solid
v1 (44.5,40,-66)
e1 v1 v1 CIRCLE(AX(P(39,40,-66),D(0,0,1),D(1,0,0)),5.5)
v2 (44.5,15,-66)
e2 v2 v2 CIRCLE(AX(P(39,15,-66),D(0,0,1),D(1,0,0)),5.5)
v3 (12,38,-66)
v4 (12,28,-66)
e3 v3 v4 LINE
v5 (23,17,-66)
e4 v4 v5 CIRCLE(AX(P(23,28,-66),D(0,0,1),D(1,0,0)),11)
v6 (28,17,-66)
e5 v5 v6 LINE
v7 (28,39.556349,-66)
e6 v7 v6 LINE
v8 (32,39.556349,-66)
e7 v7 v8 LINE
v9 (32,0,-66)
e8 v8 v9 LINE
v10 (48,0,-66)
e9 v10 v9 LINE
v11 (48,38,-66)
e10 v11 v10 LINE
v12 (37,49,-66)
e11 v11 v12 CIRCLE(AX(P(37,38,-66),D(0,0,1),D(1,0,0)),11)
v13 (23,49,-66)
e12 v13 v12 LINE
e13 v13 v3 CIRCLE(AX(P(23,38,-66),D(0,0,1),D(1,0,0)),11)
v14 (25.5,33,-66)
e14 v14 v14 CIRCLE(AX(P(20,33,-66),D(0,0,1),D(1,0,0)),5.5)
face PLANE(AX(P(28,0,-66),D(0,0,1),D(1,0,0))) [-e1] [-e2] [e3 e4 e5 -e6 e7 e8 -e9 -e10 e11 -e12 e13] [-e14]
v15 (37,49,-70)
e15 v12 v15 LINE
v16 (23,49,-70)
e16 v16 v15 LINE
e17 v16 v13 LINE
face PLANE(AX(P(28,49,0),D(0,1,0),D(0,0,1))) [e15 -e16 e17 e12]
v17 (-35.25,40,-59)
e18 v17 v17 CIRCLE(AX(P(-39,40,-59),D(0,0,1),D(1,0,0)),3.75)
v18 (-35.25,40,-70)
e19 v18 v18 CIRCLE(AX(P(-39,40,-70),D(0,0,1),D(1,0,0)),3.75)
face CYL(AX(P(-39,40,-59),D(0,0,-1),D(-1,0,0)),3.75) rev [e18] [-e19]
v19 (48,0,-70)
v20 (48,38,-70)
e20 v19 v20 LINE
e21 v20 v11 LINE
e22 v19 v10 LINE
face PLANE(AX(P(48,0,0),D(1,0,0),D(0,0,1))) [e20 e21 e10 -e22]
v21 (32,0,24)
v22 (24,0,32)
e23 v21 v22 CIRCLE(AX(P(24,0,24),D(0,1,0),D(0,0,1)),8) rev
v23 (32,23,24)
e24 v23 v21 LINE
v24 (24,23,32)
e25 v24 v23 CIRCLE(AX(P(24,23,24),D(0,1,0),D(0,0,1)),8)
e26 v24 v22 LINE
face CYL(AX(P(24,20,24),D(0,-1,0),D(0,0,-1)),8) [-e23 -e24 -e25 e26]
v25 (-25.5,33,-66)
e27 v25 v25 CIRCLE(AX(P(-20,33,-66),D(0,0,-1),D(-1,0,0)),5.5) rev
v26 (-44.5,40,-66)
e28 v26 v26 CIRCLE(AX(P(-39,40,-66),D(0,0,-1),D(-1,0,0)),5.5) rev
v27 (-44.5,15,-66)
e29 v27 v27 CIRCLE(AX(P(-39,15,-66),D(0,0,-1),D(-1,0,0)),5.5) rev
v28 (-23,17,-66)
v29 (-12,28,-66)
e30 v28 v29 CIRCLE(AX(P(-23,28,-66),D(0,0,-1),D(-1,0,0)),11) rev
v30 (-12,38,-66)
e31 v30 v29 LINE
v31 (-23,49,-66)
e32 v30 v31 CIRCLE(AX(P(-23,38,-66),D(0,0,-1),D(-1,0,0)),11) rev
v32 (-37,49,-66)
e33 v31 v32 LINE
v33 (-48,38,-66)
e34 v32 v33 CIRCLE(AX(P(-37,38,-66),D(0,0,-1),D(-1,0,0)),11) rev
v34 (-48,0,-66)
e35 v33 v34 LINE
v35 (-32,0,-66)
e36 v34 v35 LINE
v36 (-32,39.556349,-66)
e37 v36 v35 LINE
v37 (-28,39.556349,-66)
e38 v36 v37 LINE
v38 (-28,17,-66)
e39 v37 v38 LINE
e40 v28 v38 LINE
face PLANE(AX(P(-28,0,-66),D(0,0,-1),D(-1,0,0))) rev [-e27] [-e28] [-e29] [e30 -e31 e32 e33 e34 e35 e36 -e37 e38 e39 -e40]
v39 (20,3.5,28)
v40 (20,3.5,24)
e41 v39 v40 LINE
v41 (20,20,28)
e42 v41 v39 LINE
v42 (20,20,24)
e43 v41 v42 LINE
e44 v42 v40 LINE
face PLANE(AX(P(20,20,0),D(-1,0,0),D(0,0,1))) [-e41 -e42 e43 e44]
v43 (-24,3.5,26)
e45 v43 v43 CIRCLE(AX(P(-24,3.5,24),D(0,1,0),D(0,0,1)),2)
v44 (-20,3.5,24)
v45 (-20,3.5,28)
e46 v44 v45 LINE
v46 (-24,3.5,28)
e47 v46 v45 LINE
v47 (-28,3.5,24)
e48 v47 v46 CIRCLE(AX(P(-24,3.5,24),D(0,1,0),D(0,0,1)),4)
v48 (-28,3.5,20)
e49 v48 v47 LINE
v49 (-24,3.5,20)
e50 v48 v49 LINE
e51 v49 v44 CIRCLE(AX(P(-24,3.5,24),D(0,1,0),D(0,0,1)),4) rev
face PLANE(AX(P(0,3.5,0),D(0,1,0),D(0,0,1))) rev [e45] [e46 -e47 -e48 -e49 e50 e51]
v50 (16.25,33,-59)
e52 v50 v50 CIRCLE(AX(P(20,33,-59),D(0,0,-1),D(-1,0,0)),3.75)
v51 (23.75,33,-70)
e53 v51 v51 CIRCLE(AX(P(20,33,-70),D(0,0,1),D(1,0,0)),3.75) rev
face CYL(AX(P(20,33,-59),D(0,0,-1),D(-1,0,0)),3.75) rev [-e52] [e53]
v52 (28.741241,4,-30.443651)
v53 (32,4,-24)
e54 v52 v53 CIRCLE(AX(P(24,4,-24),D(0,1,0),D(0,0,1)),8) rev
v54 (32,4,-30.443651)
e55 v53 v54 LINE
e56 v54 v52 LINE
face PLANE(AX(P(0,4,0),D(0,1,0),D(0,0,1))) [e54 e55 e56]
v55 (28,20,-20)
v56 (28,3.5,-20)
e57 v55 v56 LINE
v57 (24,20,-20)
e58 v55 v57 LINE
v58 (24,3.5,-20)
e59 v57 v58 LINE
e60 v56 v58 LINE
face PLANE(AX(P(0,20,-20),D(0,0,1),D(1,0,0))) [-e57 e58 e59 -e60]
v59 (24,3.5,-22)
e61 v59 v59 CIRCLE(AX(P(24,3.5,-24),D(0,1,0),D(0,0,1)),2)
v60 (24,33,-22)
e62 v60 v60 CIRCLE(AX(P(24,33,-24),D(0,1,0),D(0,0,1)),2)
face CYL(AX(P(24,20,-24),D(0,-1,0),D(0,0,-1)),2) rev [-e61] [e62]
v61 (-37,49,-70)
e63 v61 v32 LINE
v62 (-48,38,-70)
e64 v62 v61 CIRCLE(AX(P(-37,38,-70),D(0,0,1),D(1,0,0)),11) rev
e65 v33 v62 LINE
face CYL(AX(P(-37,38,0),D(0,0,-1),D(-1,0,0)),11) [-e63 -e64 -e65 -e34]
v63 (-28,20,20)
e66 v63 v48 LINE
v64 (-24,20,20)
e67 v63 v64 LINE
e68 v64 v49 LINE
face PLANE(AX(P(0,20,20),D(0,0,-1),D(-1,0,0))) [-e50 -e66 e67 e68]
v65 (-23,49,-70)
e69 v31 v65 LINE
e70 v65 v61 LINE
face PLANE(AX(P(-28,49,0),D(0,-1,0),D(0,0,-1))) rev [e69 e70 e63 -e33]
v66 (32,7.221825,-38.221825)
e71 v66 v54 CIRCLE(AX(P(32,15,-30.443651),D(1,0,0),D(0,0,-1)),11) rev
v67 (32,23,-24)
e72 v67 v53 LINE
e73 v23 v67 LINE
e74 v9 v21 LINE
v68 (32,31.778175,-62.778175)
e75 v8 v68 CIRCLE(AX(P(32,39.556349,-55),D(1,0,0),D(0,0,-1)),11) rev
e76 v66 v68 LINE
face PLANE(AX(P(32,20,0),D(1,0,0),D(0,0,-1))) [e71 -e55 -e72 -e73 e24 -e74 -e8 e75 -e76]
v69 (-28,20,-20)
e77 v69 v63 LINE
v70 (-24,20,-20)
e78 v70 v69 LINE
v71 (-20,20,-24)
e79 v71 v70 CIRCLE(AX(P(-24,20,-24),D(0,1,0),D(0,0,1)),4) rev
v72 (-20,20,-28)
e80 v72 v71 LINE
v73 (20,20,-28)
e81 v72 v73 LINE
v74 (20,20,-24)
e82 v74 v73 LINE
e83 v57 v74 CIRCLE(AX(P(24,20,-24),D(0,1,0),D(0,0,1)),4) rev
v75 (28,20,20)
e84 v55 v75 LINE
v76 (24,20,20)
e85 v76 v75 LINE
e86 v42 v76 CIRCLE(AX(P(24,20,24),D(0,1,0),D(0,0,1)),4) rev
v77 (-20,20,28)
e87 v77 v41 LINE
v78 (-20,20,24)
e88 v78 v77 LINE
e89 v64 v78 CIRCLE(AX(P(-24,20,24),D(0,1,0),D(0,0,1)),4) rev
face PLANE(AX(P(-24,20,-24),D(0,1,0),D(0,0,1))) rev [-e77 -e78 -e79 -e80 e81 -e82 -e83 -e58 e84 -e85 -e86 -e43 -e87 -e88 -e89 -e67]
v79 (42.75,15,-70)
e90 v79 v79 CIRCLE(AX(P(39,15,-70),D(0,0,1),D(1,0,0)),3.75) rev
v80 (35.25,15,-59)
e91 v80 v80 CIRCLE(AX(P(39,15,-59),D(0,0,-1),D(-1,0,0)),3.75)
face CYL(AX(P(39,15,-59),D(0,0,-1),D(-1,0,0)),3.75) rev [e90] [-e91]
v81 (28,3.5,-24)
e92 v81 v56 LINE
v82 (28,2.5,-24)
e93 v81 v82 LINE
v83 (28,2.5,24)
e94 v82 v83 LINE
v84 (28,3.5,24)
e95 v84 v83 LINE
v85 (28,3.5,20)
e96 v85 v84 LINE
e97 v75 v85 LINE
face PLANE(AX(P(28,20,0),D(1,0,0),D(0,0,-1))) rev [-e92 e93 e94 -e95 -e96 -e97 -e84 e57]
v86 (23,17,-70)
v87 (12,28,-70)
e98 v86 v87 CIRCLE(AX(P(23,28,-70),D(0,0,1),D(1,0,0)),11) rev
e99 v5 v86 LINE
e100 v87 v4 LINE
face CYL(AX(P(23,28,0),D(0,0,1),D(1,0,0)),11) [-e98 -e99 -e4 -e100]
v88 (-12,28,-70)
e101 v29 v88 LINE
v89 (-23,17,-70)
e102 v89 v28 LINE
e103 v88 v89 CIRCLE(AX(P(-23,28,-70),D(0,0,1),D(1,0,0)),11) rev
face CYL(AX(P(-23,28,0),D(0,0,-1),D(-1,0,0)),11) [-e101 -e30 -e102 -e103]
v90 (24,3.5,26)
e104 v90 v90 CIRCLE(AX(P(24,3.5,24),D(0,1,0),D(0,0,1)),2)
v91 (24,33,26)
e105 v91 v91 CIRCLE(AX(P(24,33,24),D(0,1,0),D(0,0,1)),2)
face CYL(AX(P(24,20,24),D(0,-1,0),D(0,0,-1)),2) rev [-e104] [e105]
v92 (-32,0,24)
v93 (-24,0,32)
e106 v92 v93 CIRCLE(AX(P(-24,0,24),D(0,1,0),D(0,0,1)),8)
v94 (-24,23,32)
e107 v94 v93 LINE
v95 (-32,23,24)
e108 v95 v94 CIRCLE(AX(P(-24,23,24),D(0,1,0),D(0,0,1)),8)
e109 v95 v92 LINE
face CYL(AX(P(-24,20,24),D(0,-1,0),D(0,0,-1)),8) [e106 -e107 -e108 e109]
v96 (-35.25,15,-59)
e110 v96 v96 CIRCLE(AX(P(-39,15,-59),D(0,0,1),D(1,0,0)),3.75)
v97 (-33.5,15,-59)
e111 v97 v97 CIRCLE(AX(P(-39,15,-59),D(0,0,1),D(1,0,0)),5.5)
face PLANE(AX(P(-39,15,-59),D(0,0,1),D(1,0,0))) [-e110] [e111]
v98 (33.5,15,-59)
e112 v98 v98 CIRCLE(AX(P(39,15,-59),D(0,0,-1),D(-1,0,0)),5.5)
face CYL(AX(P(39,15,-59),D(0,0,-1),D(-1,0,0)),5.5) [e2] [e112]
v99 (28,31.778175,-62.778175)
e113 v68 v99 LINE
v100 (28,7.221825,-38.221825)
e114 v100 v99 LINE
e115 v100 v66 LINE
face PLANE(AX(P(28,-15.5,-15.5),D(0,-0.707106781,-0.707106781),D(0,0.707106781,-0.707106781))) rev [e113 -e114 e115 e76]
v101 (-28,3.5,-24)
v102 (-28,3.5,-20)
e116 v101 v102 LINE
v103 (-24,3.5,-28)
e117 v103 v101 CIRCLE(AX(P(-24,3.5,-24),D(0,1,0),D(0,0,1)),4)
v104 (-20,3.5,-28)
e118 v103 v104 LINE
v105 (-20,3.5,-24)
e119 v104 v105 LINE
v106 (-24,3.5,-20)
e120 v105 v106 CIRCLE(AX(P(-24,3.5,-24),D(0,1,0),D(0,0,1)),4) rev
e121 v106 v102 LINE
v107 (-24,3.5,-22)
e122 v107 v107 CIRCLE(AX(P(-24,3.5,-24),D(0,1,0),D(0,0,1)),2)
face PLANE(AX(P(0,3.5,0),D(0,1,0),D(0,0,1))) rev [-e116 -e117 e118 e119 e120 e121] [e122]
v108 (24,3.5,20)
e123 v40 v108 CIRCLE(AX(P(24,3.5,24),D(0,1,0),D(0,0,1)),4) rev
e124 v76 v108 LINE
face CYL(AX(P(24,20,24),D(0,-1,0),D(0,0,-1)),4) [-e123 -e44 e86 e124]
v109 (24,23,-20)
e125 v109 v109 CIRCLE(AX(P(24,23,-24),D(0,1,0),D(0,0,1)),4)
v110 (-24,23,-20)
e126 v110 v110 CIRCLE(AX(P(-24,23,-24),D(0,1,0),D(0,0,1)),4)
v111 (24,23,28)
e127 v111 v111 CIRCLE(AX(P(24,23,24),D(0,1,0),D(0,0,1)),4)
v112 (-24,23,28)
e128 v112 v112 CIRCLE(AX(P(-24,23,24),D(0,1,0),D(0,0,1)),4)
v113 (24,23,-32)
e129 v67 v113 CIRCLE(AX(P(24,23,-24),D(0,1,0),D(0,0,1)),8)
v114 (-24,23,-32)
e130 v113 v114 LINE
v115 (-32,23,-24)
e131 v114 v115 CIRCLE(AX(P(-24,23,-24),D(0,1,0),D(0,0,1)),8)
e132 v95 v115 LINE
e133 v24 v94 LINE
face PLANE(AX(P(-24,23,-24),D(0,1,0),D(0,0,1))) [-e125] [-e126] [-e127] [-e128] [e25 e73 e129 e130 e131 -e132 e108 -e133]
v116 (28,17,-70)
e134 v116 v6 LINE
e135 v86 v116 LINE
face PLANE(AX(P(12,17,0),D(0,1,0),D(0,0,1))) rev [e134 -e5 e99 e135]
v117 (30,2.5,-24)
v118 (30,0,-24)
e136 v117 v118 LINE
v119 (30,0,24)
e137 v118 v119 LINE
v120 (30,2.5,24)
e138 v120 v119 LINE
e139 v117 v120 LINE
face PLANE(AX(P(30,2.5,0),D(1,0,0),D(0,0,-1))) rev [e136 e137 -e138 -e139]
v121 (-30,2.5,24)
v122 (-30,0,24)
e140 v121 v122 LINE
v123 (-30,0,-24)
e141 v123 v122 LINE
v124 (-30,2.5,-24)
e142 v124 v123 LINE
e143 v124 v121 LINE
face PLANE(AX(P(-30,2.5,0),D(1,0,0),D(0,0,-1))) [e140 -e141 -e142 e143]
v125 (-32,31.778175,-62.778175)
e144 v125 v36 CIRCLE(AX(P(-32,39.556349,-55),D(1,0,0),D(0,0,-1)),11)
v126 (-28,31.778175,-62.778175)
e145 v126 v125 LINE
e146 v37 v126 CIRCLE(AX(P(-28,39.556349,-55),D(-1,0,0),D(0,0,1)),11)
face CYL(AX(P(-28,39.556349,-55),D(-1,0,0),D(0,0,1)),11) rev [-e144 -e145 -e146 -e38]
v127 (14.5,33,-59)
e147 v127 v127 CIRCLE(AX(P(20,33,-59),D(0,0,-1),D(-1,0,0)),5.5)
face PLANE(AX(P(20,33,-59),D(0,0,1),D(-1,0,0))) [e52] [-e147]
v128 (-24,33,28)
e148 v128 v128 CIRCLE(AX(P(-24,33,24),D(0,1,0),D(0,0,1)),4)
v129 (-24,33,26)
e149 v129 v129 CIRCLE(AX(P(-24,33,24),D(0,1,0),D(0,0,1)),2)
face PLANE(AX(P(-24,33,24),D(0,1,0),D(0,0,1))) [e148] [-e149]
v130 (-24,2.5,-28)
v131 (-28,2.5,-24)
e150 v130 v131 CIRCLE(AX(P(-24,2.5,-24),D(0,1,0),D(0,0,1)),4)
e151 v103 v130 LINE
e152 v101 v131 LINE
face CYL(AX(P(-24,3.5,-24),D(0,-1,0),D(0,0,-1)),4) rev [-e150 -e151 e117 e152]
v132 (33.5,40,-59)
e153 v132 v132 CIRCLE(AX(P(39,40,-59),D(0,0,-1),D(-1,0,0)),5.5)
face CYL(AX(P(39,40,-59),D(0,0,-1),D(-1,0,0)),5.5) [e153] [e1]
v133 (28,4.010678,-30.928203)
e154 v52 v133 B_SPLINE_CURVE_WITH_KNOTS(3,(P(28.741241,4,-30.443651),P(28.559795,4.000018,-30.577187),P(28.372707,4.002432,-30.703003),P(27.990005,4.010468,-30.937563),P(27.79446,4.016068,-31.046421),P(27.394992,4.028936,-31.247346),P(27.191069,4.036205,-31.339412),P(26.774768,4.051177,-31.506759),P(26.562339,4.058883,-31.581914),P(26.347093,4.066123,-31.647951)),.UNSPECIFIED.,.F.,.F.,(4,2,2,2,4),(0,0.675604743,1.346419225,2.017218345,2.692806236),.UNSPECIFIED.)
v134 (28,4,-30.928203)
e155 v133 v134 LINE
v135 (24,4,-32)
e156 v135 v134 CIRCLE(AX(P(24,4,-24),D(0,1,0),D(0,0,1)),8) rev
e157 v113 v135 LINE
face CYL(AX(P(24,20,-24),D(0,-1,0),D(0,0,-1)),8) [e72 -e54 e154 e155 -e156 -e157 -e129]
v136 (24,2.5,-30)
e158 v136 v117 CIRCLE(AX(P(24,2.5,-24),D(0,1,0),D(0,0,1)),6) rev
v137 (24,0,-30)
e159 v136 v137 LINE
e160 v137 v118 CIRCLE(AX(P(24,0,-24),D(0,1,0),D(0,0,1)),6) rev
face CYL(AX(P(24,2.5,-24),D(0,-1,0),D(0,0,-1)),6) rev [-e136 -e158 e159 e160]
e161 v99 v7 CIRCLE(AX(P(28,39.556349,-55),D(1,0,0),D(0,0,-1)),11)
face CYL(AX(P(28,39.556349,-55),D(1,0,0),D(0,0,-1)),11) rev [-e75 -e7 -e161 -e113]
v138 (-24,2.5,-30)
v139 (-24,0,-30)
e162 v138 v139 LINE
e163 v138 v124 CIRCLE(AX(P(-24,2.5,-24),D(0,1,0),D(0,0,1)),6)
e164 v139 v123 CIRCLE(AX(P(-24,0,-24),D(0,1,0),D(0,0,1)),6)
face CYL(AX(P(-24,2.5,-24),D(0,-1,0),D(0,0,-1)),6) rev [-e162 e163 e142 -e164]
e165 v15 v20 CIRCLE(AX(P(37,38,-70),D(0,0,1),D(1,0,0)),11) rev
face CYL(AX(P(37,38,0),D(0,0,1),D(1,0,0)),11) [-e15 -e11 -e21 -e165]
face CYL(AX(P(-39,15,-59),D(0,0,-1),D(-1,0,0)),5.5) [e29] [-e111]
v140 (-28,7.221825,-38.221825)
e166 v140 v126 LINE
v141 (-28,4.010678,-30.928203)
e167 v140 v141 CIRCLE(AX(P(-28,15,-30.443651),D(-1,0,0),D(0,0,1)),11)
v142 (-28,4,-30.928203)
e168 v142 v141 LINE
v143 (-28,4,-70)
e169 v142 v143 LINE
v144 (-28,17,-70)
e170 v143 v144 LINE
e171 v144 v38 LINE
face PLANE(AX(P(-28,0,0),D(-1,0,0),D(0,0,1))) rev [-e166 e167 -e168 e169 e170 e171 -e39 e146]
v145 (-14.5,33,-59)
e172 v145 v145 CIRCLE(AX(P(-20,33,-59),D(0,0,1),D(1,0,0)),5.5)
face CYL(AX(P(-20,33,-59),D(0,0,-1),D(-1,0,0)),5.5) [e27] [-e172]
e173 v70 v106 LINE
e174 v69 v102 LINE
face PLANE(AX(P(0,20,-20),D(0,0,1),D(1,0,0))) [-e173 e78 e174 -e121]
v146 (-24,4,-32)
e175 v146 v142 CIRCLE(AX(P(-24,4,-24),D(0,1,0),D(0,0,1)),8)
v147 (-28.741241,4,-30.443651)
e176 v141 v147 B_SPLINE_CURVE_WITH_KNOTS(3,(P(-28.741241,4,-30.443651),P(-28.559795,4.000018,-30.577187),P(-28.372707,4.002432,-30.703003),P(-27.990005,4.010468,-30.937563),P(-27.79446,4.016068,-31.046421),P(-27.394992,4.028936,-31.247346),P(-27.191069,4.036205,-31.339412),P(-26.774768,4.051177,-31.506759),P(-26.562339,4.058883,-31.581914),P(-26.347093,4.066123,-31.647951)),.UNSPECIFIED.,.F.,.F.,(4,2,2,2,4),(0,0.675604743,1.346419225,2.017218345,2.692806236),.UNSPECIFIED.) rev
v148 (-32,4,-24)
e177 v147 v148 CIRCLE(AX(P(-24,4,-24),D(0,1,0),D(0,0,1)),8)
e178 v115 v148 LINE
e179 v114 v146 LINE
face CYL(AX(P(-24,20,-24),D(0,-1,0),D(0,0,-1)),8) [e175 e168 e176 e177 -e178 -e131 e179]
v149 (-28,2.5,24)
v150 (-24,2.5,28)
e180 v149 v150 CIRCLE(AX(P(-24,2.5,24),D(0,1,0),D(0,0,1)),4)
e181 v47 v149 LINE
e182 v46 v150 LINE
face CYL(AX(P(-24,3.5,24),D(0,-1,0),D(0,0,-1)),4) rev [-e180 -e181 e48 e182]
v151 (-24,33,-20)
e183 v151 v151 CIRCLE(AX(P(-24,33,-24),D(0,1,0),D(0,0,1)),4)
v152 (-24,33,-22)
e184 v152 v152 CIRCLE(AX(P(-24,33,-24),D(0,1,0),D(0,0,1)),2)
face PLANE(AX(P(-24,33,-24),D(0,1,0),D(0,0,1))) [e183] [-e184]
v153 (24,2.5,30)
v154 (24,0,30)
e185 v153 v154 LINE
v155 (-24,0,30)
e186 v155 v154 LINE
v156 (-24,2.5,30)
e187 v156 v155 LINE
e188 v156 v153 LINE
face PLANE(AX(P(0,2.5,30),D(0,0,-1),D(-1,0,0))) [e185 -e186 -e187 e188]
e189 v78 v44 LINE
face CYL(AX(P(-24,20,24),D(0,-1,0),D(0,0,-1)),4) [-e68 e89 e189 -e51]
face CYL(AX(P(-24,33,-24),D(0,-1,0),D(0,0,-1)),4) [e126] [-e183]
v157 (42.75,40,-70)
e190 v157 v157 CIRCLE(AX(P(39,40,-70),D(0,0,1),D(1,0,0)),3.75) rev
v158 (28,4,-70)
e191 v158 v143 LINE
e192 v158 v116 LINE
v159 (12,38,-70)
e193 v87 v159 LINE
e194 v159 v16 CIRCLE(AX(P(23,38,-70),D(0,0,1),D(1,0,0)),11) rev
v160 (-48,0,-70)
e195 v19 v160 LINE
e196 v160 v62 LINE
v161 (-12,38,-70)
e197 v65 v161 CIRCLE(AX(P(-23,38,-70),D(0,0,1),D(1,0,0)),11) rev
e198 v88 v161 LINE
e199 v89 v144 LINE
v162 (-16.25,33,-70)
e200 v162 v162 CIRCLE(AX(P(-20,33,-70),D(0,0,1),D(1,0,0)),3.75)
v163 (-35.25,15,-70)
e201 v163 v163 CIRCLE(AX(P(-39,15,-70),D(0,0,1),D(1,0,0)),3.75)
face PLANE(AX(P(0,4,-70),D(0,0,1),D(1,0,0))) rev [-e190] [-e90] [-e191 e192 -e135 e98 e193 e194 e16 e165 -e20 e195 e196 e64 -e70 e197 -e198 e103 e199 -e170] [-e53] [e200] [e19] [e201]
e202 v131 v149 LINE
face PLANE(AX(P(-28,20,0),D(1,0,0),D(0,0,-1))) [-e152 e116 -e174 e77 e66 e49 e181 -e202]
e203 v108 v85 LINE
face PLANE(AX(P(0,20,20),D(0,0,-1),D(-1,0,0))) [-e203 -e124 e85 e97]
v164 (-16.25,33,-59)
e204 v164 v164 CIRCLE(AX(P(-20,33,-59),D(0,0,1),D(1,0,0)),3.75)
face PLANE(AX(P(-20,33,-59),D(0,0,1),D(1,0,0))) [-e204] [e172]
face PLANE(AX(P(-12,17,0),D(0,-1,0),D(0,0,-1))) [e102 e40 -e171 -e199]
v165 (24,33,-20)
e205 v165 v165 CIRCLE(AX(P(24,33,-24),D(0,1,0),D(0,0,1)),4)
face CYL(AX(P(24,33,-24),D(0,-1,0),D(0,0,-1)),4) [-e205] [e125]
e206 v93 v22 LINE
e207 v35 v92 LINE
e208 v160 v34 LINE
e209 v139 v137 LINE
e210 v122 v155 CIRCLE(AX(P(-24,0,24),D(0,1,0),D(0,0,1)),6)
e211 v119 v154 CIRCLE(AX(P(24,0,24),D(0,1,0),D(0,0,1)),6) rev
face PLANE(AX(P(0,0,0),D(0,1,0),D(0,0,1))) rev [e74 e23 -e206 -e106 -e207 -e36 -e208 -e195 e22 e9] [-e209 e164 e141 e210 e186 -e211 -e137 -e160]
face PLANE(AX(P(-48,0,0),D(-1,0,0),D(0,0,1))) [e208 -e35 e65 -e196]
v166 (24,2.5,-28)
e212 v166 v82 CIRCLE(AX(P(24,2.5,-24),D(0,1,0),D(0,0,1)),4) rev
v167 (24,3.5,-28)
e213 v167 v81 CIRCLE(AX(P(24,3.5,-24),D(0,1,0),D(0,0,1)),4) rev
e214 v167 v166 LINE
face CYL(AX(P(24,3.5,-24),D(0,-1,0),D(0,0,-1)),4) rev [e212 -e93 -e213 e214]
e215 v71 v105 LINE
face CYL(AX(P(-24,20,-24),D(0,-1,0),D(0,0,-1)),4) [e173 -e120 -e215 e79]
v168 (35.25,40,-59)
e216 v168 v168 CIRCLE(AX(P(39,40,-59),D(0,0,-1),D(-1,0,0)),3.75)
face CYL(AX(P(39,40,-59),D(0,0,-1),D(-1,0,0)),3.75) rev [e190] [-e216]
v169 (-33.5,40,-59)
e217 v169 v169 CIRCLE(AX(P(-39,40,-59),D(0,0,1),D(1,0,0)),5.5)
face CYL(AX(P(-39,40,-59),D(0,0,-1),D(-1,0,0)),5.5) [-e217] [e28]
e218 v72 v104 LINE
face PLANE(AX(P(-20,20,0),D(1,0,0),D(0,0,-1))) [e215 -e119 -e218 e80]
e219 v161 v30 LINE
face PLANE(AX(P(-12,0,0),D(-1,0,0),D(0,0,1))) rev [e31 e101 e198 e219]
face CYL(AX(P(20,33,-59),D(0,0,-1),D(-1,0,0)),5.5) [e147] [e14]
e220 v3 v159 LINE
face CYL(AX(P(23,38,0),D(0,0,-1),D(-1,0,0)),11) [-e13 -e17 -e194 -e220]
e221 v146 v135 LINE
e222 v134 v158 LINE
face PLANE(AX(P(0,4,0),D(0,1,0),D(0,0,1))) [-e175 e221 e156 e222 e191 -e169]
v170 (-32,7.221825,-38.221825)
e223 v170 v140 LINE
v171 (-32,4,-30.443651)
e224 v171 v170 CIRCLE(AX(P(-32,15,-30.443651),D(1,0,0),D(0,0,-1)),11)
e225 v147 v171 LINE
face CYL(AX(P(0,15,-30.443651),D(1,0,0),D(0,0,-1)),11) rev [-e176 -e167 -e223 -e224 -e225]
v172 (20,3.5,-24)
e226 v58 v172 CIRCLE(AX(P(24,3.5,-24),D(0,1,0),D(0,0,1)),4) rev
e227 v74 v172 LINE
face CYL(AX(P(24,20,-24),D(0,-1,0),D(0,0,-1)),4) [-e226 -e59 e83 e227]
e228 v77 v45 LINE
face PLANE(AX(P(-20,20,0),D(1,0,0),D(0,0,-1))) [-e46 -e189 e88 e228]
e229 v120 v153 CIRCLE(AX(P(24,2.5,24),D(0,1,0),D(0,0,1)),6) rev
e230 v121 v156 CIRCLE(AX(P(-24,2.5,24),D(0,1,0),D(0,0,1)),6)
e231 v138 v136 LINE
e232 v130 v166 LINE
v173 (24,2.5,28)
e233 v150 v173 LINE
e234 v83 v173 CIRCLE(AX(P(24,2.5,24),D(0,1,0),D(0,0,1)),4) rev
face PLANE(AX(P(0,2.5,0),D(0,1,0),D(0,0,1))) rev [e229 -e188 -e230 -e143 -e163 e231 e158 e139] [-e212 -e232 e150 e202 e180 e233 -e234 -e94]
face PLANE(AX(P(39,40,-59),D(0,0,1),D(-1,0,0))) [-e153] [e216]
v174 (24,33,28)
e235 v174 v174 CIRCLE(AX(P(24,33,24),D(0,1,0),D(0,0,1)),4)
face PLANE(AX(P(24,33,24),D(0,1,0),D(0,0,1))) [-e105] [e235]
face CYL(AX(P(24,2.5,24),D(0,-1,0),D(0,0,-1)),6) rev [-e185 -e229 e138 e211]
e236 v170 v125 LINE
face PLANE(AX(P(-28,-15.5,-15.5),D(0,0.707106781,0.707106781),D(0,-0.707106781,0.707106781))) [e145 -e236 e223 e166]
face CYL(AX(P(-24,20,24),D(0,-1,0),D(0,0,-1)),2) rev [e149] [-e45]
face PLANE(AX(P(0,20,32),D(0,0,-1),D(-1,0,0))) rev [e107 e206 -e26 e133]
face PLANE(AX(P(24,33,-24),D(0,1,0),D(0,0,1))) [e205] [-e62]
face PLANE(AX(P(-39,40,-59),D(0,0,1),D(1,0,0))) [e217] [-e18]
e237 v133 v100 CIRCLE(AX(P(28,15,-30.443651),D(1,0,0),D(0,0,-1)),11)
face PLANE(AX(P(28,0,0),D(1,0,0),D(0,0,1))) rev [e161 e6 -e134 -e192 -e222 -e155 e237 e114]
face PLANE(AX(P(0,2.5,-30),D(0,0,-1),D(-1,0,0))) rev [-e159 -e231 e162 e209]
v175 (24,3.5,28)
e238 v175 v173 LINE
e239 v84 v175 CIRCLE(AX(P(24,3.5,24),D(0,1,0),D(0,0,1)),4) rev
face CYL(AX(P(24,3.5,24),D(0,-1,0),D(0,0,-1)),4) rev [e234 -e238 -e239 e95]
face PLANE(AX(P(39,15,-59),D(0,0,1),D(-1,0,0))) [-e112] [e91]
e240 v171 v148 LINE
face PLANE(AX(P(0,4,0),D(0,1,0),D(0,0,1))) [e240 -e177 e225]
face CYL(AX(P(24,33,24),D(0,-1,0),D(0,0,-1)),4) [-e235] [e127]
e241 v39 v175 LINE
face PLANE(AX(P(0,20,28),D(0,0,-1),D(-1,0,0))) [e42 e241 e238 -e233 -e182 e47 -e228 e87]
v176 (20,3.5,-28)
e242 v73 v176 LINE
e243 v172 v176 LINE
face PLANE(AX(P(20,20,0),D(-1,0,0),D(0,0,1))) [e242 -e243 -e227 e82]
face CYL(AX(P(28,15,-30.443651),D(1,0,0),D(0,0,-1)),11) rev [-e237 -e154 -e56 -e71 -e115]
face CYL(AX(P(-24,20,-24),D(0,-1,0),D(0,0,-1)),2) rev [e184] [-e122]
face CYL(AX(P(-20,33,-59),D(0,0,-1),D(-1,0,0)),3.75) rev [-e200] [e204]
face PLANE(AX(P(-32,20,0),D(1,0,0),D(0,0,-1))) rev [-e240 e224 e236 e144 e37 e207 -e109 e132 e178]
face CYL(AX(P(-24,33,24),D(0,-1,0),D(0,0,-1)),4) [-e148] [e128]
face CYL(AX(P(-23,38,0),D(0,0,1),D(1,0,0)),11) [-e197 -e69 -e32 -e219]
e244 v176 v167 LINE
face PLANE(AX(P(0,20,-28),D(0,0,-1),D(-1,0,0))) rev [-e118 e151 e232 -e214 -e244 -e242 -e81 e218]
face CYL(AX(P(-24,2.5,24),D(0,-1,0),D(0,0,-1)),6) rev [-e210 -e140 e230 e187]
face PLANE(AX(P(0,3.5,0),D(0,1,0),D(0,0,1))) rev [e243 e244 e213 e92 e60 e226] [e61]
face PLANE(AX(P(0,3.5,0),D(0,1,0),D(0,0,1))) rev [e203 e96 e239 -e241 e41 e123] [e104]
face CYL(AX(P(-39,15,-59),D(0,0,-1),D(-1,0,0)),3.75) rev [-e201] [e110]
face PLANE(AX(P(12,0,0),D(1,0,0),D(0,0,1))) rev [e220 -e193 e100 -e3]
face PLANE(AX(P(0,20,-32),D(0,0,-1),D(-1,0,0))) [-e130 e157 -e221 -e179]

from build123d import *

# Parameters (mm, degrees)
SKETCH1_R            = 2
BOSS_EXTRUDE1_DEPTH  = 20
CUT_EXTRUDE3_DEPTH   = 2.5
CUT_EXTRUDE4_DEPTH   = 3.5
BOSS_EXTRUDE6_START  = 20
SKETCH1_6_R          = 20
SKETCH1_6_R_2        = 16
SKETCH1_6_R_3        = 6.1
SKETCH1_6_R_4        = 1.5
SKETCH1_6_R_5        = 2
BOSS_EXTRUDE6_DEPTH  = 3
BOSS_EXTRUDE7_DEPTH  = 4
BOSS_EXTRUDE11_DEPTH = 4
SKETCH3_3_W          = 4
SKETCH3_3_H          = 49
BOSS_EXTRUDE12_DEPTH = 16
SKETCH3_4_W          = 4
SKETCH3_4_H          = 6
BOSS_EXTRUDE13_DEPTH = 20
FILLET2_R            = 11
SKETCH4_R            = 5.5
SKETCH4_R_2          = 3.75
BOSS_EXTRUDE14_DEPTH = 7
CUT_EXTRUDE5_START   = -7
SKETCH4_3_R          = 3.75
CUT_EXTRUDE5_DEPTH   = 7
FILLET2_OF_MIRROR2_R = 11
FILLET3_R            = 11
BOSS_EXTRUDE15_START = 23
SKETCH5_R            = 4
SKETCH5_R_2          = 2
BOSS_EXTRUDE15_DEPTH = 10
SKETCH5_2_R          = 2
CUT_EXTRUDE6_DEPTH   = 90


with BuildPart() as part:
    # Sketch1 → Boss-Extrude1 (new body)
    # profile 1 of 6: a face of its own
    with BuildSketch(Plane(origin=(0, 0, 0), x_dir=(1, 0, 0), z_dir=(0, 1, 0))):
        with BuildLine():
            Line((32, -24), (32, 24))
            ThreePointArc((32, 24), (29.656854249, 29.656854249), (24, 32))
            Line((24, 32), (-24, 32))
            ThreePointArc((-24, 32), (-29.656854249, 29.656854249), (-32, 24))
            Line((-32, 24), (-32, -24))
            ThreePointArc((-32, -24), (-29.656854249, -29.656854249), (-24, -32))
            Line((-24, -32), (24, -32))
            ThreePointArc((24, -32), (29.656854249, -29.656854249), (32, -24))
        make_face()
        with BuildLine():
            ThreePointArc((-30, 24), (-28.242640687, 28.242640687), (-24, 30))
            Line((-24, 30), (24, 30))
            ThreePointArc((24, 30), (28.242640687, 28.242640687), (30, 24))
            Line((30, 24), (30, -24))
            ThreePointArc((30, -24), (28.242640687, -28.242640687), (24, -30))
            Line((24, -30), (-24, -30))
            ThreePointArc((-24, -30), (-28.242640687, -28.242640687), (-30, -24))
            Line((-30, -24), (-30, 24))
        make_face(mode=Mode.SUBTRACT)
    # profile 2 of 6: a face of its own
    with BuildSketch(Plane(origin=(0, 0, 0), x_dir=(1, 0, 0), z_dir=(0, 1, 0))):
        with BuildLine():
            Line((24, 30), (-24, 30))
            ThreePointArc((-24, 30), (-28.242640687, 28.242640687), (-30, 24))
            Line((-30, 24), (-30, -24))
            ThreePointArc((-30, -24), (-28.242640687, -28.242640687), (-24, -30))
            Line((-24, -30), (24, -30))
            ThreePointArc((24, -30), (28.242640687, -28.242640687), (30, -24))
            Line((30, -24), (30, 24))
            ThreePointArc((30, 24), (28.242640687, 28.242640687), (24, 30))
        make_face()
        with BuildLine():
            Line((-28, 20), (-28, 24))
            ThreePointArc((-28, 24), (-26.828427125, 26.828427125), (-24, 28))
            Line((-24, 28), (-20, 28))
            Line((-20, 28), (20, 28))
            Line((20, 28), (24, 28))
            ThreePointArc((24, 28), (26.828427125, 26.828427125), (28, 24))
            Line((28, 24), (28, 20))
            Line((28, 20), (28, -20))
            Line((28, -20), (28, -24))
            ThreePointArc((28, -24), (26.828427125, -26.828427125), (24, -28))
            Line((24, -28), (20, -28))
            Line((20, -28), (-20, -28))
            Line((-20, -28), (-24, -28))
            ThreePointArc((-24, -28), (-26.828427125, -26.828427125), (-28, -24))
            Line((-28, -24), (-28, -20))
            Line((-28, -20), (-28, 20))
        make_face(mode=Mode.SUBTRACT)
    # profile 3 of 6: a face of its own
    with BuildSketch(Plane(origin=(0, 0, 0), x_dir=(1, 0, 0), z_dir=(0, 1, 0))):
        with BuildLine():
            Line((-24, -20), (-28, -20))
            Line((-28, -20), (-28, -24))
            ThreePointArc((-28, -24), (-26.828427125, -26.828427125), (-24, -28))
            Line((-24, -28), (-20, -28))
            Line((-20, -28), (-20, -24))
            ThreePointArc((-20, -24), (-21.171572875, -21.171572875), (-24, -20))
        make_face()
        with Locations(Location((-24, -24, 0), (0, 0, 270))):
            Circle(SKETCH1_R, mode=Mode.SUBTRACT)
    # profile 4 of 6: a face of its own
    with BuildSketch(Plane(origin=(0, 0, 0), x_dir=(1, 0, 0), z_dir=(0, 1, 0))):
        with BuildLine():
            Line((20, -24), (20, -28))
            Line((20, -28), (24, -28))
            ThreePointArc((24, -28), (26.828427125, -26.828427125), (28, -24))
            Line((28, -24), (28, -20))
            Line((28, -20), (24, -20))
            ThreePointArc((24, -20), (21.171572875, -21.171572875), (20, -24))
        make_face()
        with Locations(Location((24, -24, 0), (0, 0, 270))):
            Circle(SKETCH1_R, mode=Mode.SUBTRACT)
    # profile 5 of 6: a face of its own
    with BuildSketch(Plane(origin=(0, 0, 0), x_dir=(1, 0, 0), z_dir=(0, 1, 0))):
        with BuildLine():
            Line((24, 28), (20, 28))
            Line((20, 28), (20, 24))
            ThreePointArc((20, 24), (21.171572875, 21.171572875), (24, 20))
            Line((24, 20), (28, 20))
            Line((28, 20), (28, 24))
            ThreePointArc((28, 24), (26.828427125, 26.828427125), (24, 28))
        make_face()
        with Locations(Location((24, 24, 0), (0, 0, 270))):
            Circle(SKETCH1_R, mode=Mode.SUBTRACT)
    # profile 6 of 6: a face of its own
    with BuildSketch(Plane(origin=(0, 0, 0), x_dir=(1, 0, 0), z_dir=(0, 1, 0))):
        with BuildLine():
            ThreePointArc((-24, 28), (-26.828427125, 26.828427125), (-28, 24))
            Line((-28, 24), (-28, 20))
            Line((-28, 20), (-24, 20))
            ThreePointArc((-24, 20), (-21.171572875, 21.171572875), (-20, 24))
            Line((-20, 24), (-20, 28))
            Line((-20, 28), (-24, 28))
        make_face()
        with Locations(Location((-24, 24, 0), (0, 0, 270))):
            Circle(SKETCH1_R, mode=Mode.SUBTRACT)
    extrude(amount=BOSS_EXTRUDE1_DEPTH)

    # Sketch1<4> → Cut-Extrude3 (cut)
    with BuildSketch(Plane(origin=(0, 0, 0), x_dir=(1, 0, 0), z_dir=(0, 1, 0))):
        with BuildLine():
            Line((-24, 30), (24, 30))
            ThreePointArc((24, 30), (28.242640687, 28.242640687), (30, 24))
            Line((30, 24), (30, -24))
            ThreePointArc((30, -24), (28.242640687, -28.242640687), (24, -30))
            Line((24, -30), (-24, -30))
            ThreePointArc((-24, -30), (-28.242640687, -28.242640687), (-30, -24))
            Line((-30, -24), (-30, 24))
            ThreePointArc((-30, 24), (-28.242640687, 28.242640687), (-24, 30))
        make_face()
        with BuildLine():
            Line((-28, 24), (-28, -24))
            ThreePointArc((-28, -24), (-26.828427125, -26.828427125), (-24, -28))
            Line((-24, -28), (24, -28))
            ThreePointArc((24, -28), (26.828427125, -26.828427125), (28, -24))
            Line((28, -24), (28, 24))
            ThreePointArc((28, 24), (26.828427125, 26.828427125), (24, 28))
            Line((24, 28), (-24, 28))
            ThreePointArc((-24, 28), (-26.828427125, 26.828427125), (-28, 24))
        make_face(mode=Mode.SUBTRACT)
    extrude(amount=CUT_EXTRUDE3_DEPTH, mode=Mode.SUBTRACT)

    # Sketch1<5> → Cut-Extrude4 (cut)
    with BuildSketch(Plane(origin=(0, 0, 0), x_dir=(1, 0, 0), z_dir=(0, 1, 0))):
        with BuildLine():
            Line((-28, 24), (-28, -24))
            ThreePointArc((-28, -24), (-26.828427125, -26.828427125), (-24, -28))
            Line((-24, -28), (24, -28))
            ThreePointArc((24, -28), (26.828427125, -26.828427125), (28, -24))
            Line((28, -24), (28, 24))
            ThreePointArc((28, 24), (26.828427125, 26.828427125), (24, 28))
            Line((24, 28), (-24, 28))
            ThreePointArc((-24, 28), (-26.828427125, 26.828427125), (-28, 24))
        make_face()
    extrude(amount=CUT_EXTRUDE4_DEPTH, mode=Mode.SUBTRACT)

    # Sketch1<6> → Boss-Extrude6 (add)
    # profile 1 of 22: a face of its own
    with BuildSketch(Plane(origin=(0, 0, 0), x_dir=(1, 0, 0), z_dir=(0, 1, 0)).offset(BOSS_EXTRUDE6_START)):
        with BuildLine():
            Line((32, -24), (32, 24))
            ThreePointArc((32, 24), (29.656854249, 29.656854249), (24, 32))
            Line((24, 32), (-24, 32))
            ThreePointArc((-24, 32), (-29.656854249, 29.656854249), (-32, 24))
            Line((-32, 24), (-32, -24))
            ThreePointArc((-32, -24), (-29.656854249, -29.656854249), (-24, -32))
            Line((-24, -32), (24, -32))
            ThreePointArc((24, -32), (29.656854249, -29.656854249), (32, -24))
        make_face()
        with BuildLine():
            ThreePointArc((-30, 24), (-28.242640687, 28.242640687), (-24, 30))
            Line((-24, 30), (24, 30))
            ThreePointArc((24, 30), (28.242640687, 28.242640687), (30, 24))
            Line((30, 24), (30, -24))
            ThreePointArc((30, -24), (28.242640687, -28.242640687), (24, -30))
            Line((24, -30), (-24, -30))
            ThreePointArc((-24, -30), (-28.242640687, -28.242640687), (-30, -24))
            Line((-30, -24), (-30, 24))
        make_face(mode=Mode.SUBTRACT)
    # profile 2 of 22: a face of its own
    with BuildSketch(Plane(origin=(0, 0, 0), x_dir=(1, 0, 0), z_dir=(0, 1, 0)).offset(BOSS_EXTRUDE6_START)):
        with BuildLine():
            Line((24, 30), (-24, 30))
            ThreePointArc((-24, 30), (-28.242640687, 28.242640687), (-30, 24))
            Line((-30, 24), (-30, -24))
            ThreePointArc((-30, -24), (-28.242640687, -28.242640687), (-24, -30))
            Line((-24, -30), (24, -30))
            ThreePointArc((24, -30), (28.242640687, -28.242640687), (30, -24))
            Line((30, -24), (30, 24))
            ThreePointArc((30, 24), (28.242640687, 28.242640687), (24, 30))
        make_face()
        with BuildLine():
            Line((-28, 20), (-28, 24))
            ThreePointArc((-28, 24), (-26.828427125, 26.828427125), (-24, 28))
            Line((-24, 28), (-20, 28))
            Line((-20, 28), (20, 28))
            Line((20, 28), (24, 28))
            ThreePointArc((24, 28), (26.828427125, 26.828427125), (28, 24))
            Line((28, 24), (28, 20))
            Line((28, 20), (28, -20))
            Line((28, -20), (28, -24))
            ThreePointArc((28, -24), (26.828427125, -26.828427125), (24, -28))
            Line((24, -28), (20, -28))
            Line((20, -28), (-20, -28))
            Line((-20, -28), (-24, -28))
            ThreePointArc((-24, -28), (-26.828427125, -26.828427125), (-28, -24))
            Line((-28, -24), (-28, -20))
            Line((-28, -20), (-28, 20))
        make_face(mode=Mode.SUBTRACT)
    # profile 3 of 22: a face of its own
    with BuildSketch(Plane(origin=(0, 0, 0), x_dir=(1, 0, 0), z_dir=(0, 1, 0)).offset(BOSS_EXTRUDE6_START)):
        with BuildLine():
            Line((-24, 20), (-28, 20))
            Line((-28, 20), (-28, -20))
            Line((-28, -20), (-24, -20))
            ThreePointArc((-24, -20), (-21.171572875, -21.171572875), (-20, -24))
            Line((-20, -24), (-20, -28))
            Line((-20, -28), (20, -28))
            Line((20, -28), (20, -24))
            ThreePointArc((20, -24), (21.171572875, -21.171572875), (24, -20))
            Line((24, -20), (28, -20))
            Line((28, -20), (28, 20))
            Line((28, 20), (24, 20))
            ThreePointArc((24, 20), (21.171572875, 21.171572875), (20, 24))
            Line((20, 24), (20, 28))
            Line((20, 28), (-20, 28))
            Line((-20, 28), (-20, 24))
            ThreePointArc((-20, 24), (-21.171572875, 21.171572875), (-24, 20))
        make_face()
        with BuildLine():
            ThreePointArc((2.732186624, 19.8125), (14.142135624, 14.142135624), (19.8125, 2.732186624))
            ThreePointArc((19.8125, 2.732186624), (25.5, 0), (19.8125, -2.732186624))
            ThreePointArc((19.8125, -2.732186624), (14.142135624, -14.142135624), (2.732186624, -19.8125))
            ThreePointArc((2.732186624, -19.8125), (0, -25.5), (-2.732186624, -19.8125))
            ThreePointArc((-2.732186624, -19.8125), (-14.142135624, -14.142135624), (-19.8125, -2.732186624))
            ThreePointArc((-19.8125, -2.732186624), (-25.5, 0), (-19.8125, 2.732186624))
            ThreePointArc((-19.8125, 2.732186624), (-14.142135624, 14.142135624), (-2.732186624, 19.8125))
            ThreePointArc((-2.732186624, 19.8125), (0, 25.5), (2.732186624, 19.8125))
        make_face(mode=Mode.SUBTRACT)
    # profile 4 of 22: a face of its own
    with BuildSketch(Plane(origin=(0, 0, 0), x_dir=(1, 0, 0), z_dir=(0, 1, 0)).offset(BOSS_EXTRUDE6_START)):
        Circle(SKETCH1_6_R)
        Circle(SKETCH1_6_R_2, mode=Mode.SUBTRACT)
    # profile 5 of 22: a face of its own
    with BuildSketch(Plane(origin=(0, 0, 0), x_dir=(1, 0, 0), z_dir=(0, 1, 0)).offset(BOSS_EXTRUDE6_START)):
        Circle(SKETCH1_6_R_2)
        Circle(SKETCH1_6_R_3, mode=Mode.SUBTRACT)
    # profile 6 of 22: a face of its own
    with BuildSketch(Plane(origin=(0, 0, 0), x_dir=(1, 0, 0), z_dir=(0, 1, 0)).offset(BOSS_EXTRUDE6_START)):
        with BuildLine():
            ThreePointArc((-19.8125, -2.732186624), (-20, 0), (-19.8125, 2.732186624))
            ThreePointArc((-19.8125, 2.732186624), (-25.5, 0), (-19.8125, -2.732186624))
        make_face()
        with Locations((-22, 0)):
            Circle(SKETCH1_6_R_4, mode=Mode.SUBTRACT)
    # profile 7 of 22: a face of its own
    with BuildSketch(Plane(origin=(0, 0, 0), x_dir=(1, 0, 0), z_dir=(0, 1, 0)).offset(BOSS_EXTRUDE6_START)):
        with Locations((-22, 0)):
            Circle(SKETCH1_6_R_4)
    # profile 8 of 22: a face of its own
    with BuildSketch(Plane(origin=(0, 0, 0), x_dir=(1, 0, 0), z_dir=(0, 1, 0)).offset(BOSS_EXTRUDE6_START)):
        with BuildLine():
            ThreePointArc((-2.732186624, -19.8125), (0, -25.5), (2.732186624, -19.8125))
            ThreePointArc((2.732186624, -19.8125), (0, -20), (-2.732186624, -19.8125))
        make_face()
        with Locations((0, -22)):
            Circle(SKETCH1_6_R_4, mode=Mode.SUBTRACT)
    # profile 9 of 22: a face of its own
    with BuildSketch(Plane(origin=(0, 0, 0), x_dir=(1, 0, 0), z_dir=(0, 1, 0)).offset(BOSS_EXTRUDE6_START)):
        with Locations((0, -22)):
            Circle(SKETCH1_6_R_4)
    # profile 10 of 22: a face of its own
    with BuildSketch(Plane(origin=(0, 0, 0), x_dir=(1, 0, 0), z_dir=(0, 1, 0)).offset(BOSS_EXTRUDE6_START)):
        with BuildLine():
            ThreePointArc((19.8125, 2.732186624), (19.953069939, 1.369306394), (20, 0))
            ThreePointArc((20, 0), (19.953069939, -1.369306394), (19.8125, -2.732186624))
            ThreePointArc((19.8125, -2.732186624), (25.5, 0), (19.8125, 2.732186624))
        make_face()
        with Locations((22, 0)):
            Circle(SKETCH1_6_R_4, mode=Mode.SUBTRACT)
    # profile 11 of 22: a face of its own
    with BuildSketch(Plane(origin=(0, 0, 0), x_dir=(1, 0, 0), z_dir=(0, 1, 0)).offset(BOSS_EXTRUDE6_START)):
        with Locations((22, 0)):
            Circle(SKETCH1_6_R_4)
    # profile 12 of 22: a face of its own
    with BuildSketch(Plane(origin=(0, 0, 0), x_dir=(1, 0, 0), z_dir=(0, 1, 0)).offset(BOSS_EXTRUDE6_START)):
        with BuildLine():
            ThreePointArc((-2.732186624, 19.8125), (0, 20), (2.732186624, 19.8125))
            ThreePointArc((2.732186624, 19.8125), (0, 25.5), (-2.732186624, 19.8125))
        make_face()
        with Locations((0, 22)):
            Circle(SKETCH1_6_R_4, mode=Mode.SUBTRACT)
    # profile 13 of 22: a face of its own
    with BuildSketch(Plane(origin=(0, 0, 0), x_dir=(1, 0, 0), z_dir=(0, 1, 0)).offset(BOSS_EXTRUDE6_START)):
        with Locations((0, 22)):
            Circle(SKETCH1_6_R_4)
    # profile 14 of 22: a face of its own
    with BuildSketch(Plane(origin=(0, 0, 0), x_dir=(1, 0, 0), z_dir=(0, 1, 0)).offset(BOSS_EXTRUDE6_START)):
        with BuildLine():
            Line((20, -24), (20, -28))
            Line((20, -28), (24, -28))
            ThreePointArc((24, -28), (26.828427125, -26.828427125), (28, -24))
            Line((28, -24), (28, -20))
            Line((28, -20), (24, -20))
            ThreePointArc((24, -20), (21.171572875, -21.171572875), (20, -24))
        make_face()
        with Locations(Location((24, -24, 0), (0, 0, 270))):
            Circle(SKETCH1_6_R_5, mode=Mode.SUBTRACT)
    # profile 15 of 22: a face of its own
    with BuildSketch(Plane(origin=(0, 0, 0), x_dir=(1, 0, 0), z_dir=(0, 1, 0)).offset(BOSS_EXTRUDE6_START)):
        with Locations(Location((24, -24, 0), (0, 0, 270))):
            Circle(SKETCH1_6_R_5)
    # profile 16 of 22: a face of its own
    with BuildSketch(Plane(origin=(0, 0, 0), x_dir=(1, 0, 0), z_dir=(0, 1, 0)).offset(BOSS_EXTRUDE6_START)):
        with BuildLine():
            Line((24, 28), (20, 28))
            Line((20, 28), (20, 24))
            ThreePointArc((20, 24), (21.171572875, 21.171572875), (24, 20))
            Line((24, 20), (28, 20))
            Line((28, 20), (28, 24))
            ThreePointArc((28, 24), (26.828427125, 26.828427125), (24, 28))
        make_face()
        with Locations(Location((24, 24, 0), (0, 0, 270))):
            Circle(SKETCH1_6_R_5, mode=Mode.SUBTRACT)
    # profile 17 of 22: a face of its own
    with BuildSketch(Plane(origin=(0, 0, 0), x_dir=(1, 0, 0), z_dir=(0, 1, 0)).offset(BOSS_EXTRUDE6_START)):
        with Locations(Location((24, 24, 0), (0, 0, 270))):
            Circle(SKETCH1_6_R_5)
    # profile 18 of 22: a face of its own
    with BuildSketch(Plane(origin=(0, 0, 0), x_dir=(1, 0, 0), z_dir=(0, 1, 0)).offset(BOSS_EXTRUDE6_START)):
        with BuildLine():
            ThreePointArc((-24, 28), (-26.828427125, 26.828427125), (-28, 24))
            Line((-28, 24), (-28, 20))
            Line((-28, 20), (-24, 20))
            ThreePointArc((-24, 20), (-21.171572875, 21.171572875), (-20, 24))
            Line((-20, 24), (-20, 28))
            Line((-20, 28), (-24, 28))
        make_face()
        with Locations(Location((-24, 24, 0), (0, 0, 270))):
            Circle(SKETCH1_6_R_5, mode=Mode.SUBTRACT)
    # profile 19 of 22: a face of its own
    with BuildSketch(Plane(origin=(0, 0, 0), x_dir=(1, 0, 0), z_dir=(0, 1, 0)).offset(BOSS_EXTRUDE6_START)):
        with Locations(Location((-24, 24, 0), (0, 0, 270))):
            Circle(SKETCH1_6_R_5)
    # profile 20 of 22: a face of its own
    with BuildSketch(Plane(origin=(0, 0, 0), x_dir=(1, 0, 0), z_dir=(0, 1, 0)).offset(BOSS_EXTRUDE6_START)):
        with BuildLine():
            Line((-24, -20), (-28, -20))
            Line((-28, -20), (-28, -24))
            ThreePointArc((-28, -24), (-26.828427125, -26.828427125), (-24, -28))
            Line((-24, -28), (-20, -28))
            Line((-20, -28), (-20, -24))
            ThreePointArc((-20, -24), (-21.171572875, -21.171572875), (-24, -20))
        make_face()
        with Locations(Location((-24, -24, 0), (0, 0, 270))):
            Circle(SKETCH1_6_R_5, mode=Mode.SUBTRACT)
    # profile 21 of 22: a face of its own
    with BuildSketch(Plane(origin=(0, 0, 0), x_dir=(1, 0, 0), z_dir=(0, 1, 0)).offset(BOSS_EXTRUDE6_START)):
        with Locations(Location((-24, -24, 0), (0, 0, 270))):
            Circle(SKETCH1_6_R_5)
    # profile 22 of 22: a face of its own
    with BuildSketch(Plane(origin=(0, 0, 0), x_dir=(1, 0, 0), z_dir=(0, 1, 0)).offset(BOSS_EXTRUDE6_START)):
        Circle(SKETCH1_6_R_3)
    extrude(amount=BOSS_EXTRUDE6_DEPTH)

    # Sketch1<7> → Boss-Extrude7 (add)
    with BuildSketch(Plane(origin=(0, 0, 0), x_dir=(1, 0, 0), z_dir=(0, 1, 0))):
        with BuildLine():
            ThreePointArc((-24, 32), (-29.656854249, 29.656854249), (-32, 24))
            Line((-32, 24), (-32, 70))
            Line((-32, 70), (32, 70))
            Line((32, 70), (32, 24))
            ThreePointArc((32, 24), (29.656854249, 29.656854249), (24, 32))
            Line((24, 32), (-24, 32))
        make_face()
    extrude(amount=BOSS_EXTRUDE7_DEPTH)

    # Sketch3 → Boss-Extrude11 (add)
    with BuildSketch(Plane.ZY.offset(32)):
        Polygon((-35, 4), (-66, 35), (-66, 49), (-70, 49), (-70, 4), align=None)
    boss_extrude11 = extrude(amount=-BOSS_EXTRUDE11_DEPTH)

    # Sketch3<3> → Boss-Extrude12 (add)
    with BuildSketch(Plane.ZY.offset(32)):
        with Locations((-68, 24.5)):
            Rectangle(SKETCH3_3_W, SKETCH3_3_H)
    boss_extrude12 = extrude(amount=BOSS_EXTRUDE12_DEPTH)

    # Sketch3<4> → Boss-Extrude13 (add)
    with BuildSketch(Plane.ZY.offset(32)):
        Polygon((-66, 23), (-66, 35), (-66, 49), (-70, 49), (-70, 23), align=None)
        with Locations((-68, 20)):
            Rectangle(SKETCH3_4_W, SKETCH3_4_H)
    boss_extrude13 = extrude(amount=-BOSS_EXTRUDE13_DEPTH)

    # Fillet2
    fillet2_edges = [part.edges().sort_by_distance(p)[0] for p in [
        (-48, 49, -68),
        (-12, 17, -68),
        (-12, 49, -68),
    ]]
    fillet(fillet2_edges, radius=FILLET2_R)

    # Sketch4 → Boss-Extrude14 (add)
    # profile 1 of 3: a face of its own
    with BuildSketch(Plane.XY.offset(-66)):
        with Locations(Location((-39, 40, 0), (0, 0, 180))):
            Circle(SKETCH4_R)
        with Locations((-39, 40)):
            Circle(SKETCH4_R_2, mode=Mode.SUBTRACT)
    # profile 2 of 3: a face of its own
    with BuildSketch(Plane.XY.offset(-66)):
        with Locations(Location((-20, 33, 0), (0, 0, 180))):
            Circle(SKETCH4_R)
        with Locations((-20, 33)):
            Circle(SKETCH4_R_2, mode=Mode.SUBTRACT)
    # profile 3 of 3: a face of its own
    with BuildSketch(Plane.XY.offset(-66)):
        with Locations(Location((-39, 15, 0), (0, 0, 180))):
            Circle(SKETCH4_R)
        with Locations((-39, 15)):
            Circle(SKETCH4_R_2, mode=Mode.SUBTRACT)
    boss_extrude14 = extrude(amount=BOSS_EXTRUDE14_DEPTH)

    # Sketch4<3> → Cut-Extrude5 (cut)
    with BuildSketch(Plane.XY.offset(-66).offset(CUT_EXTRUDE5_START)):
        with Locations((-39, 40)):
            Circle(SKETCH4_3_R)
        with Locations((-39, 15)):
            Circle(SKETCH4_3_R)
        with Locations((-20, 33)):
            Circle(SKETCH4_3_R)
    cut_extrude5 = extrude(amount=CUT_EXTRUDE5_DEPTH, mode=Mode.SUBTRACT)

    # Mirror2: Boss-Extrude11, Boss-Extrude12, Boss-Extrude13, Boss-Extrude14, Cut-Extrude5 across plane
    add(boss_extrude11.mirror(Plane.ZY))
    add(boss_extrude12.mirror(Plane.ZY))
    add(boss_extrude13.mirror(Plane.ZY))
    add(boss_extrude14.mirror(Plane.ZY))
    add(cut_extrude5.mirror(Plane.ZY), mode=Mode.SUBTRACT)

    # Fillet2 of Mirror2
    fillet2_of_mirror2_edges = [part.edges().sort_by_distance(p)[0] for p in [
        (48, 49, -68),
        (12, 17, -68),
        (12, 49, -68),
    ]]
    fillet(fillet2_of_mirror2_edges, radius=FILLET2_OF_MIRROR2_R)

    # Fillet3
    # the kernel refuses this fillet: 11 mm, written as the material it adds along each edge
    with BuildSketch(Plane(origin=(-32, 35, -66), x_dir=(0, 1, 0), z_dir=(1, 0, 0)), Plane(origin=(32, 4, -35), x_dir=(0, 0, 1), z_dir=(-1, 0, 0))) as fillet3_piece_1:
        with BuildLine():
            CenterArc((FILLET3_R * 0.414213562373, FILLET3_R), FILLET3_R, 225, 45)
            Line((-FILLET3_R * 0.292893218813, FILLET3_R * 0.292893218813), (0, 0))
            Line((0, 0), (FILLET3_R * 0.414213562373, 0))
        make_face()
    extrude(amount=4)
    with BuildSketch(Plane(origin=(-32, 4, -35), x_dir=(0, 0, 1), z_dir=(1, 0, 0)), Plane(origin=(32, 35, -66), x_dir=(0, 1, 0), z_dir=(-1, 0, 0))) as fillet3_piece_2:
        with BuildLine():
            CenterArc((FILLET3_R * 0.414213562373, -FILLET3_R), FILLET3_R, 90, 45)
            Line((-FILLET3_R * 0.292893218813, -FILLET3_R * 0.292893218813), (0, 0))
            Line((0, 0), (FILLET3_R * 0.414213562373, 0))
        make_face()
    extrude(amount=4)

    # Sketch5 → Boss-Extrude15 (add)
    # profile 1 of 4: a face of its own
    with BuildSketch(Plane(origin=(0, 0, 0), x_dir=(1, 0, 0), z_dir=(0, 1, 0)).offset(BOSS_EXTRUDE15_START)):
        with Locations(Location((-24, 24, 0), (0, 0, 270))):
            Circle(SKETCH5_R)
        with Locations(Location((-24, 24, 0), (0, 0, 270))):
            Circle(SKETCH5_R_2, mode=Mode.SUBTRACT)
    # profile 2 of 4: a face of its own
    with BuildSketch(Plane(origin=(0, 0, 0), x_dir=(1, 0, 0), z_dir=(0, 1, 0)).offset(BOSS_EXTRUDE15_START)):
        with Locations(Location((24, 24, 0), (0, 0, 270))):
            Circle(SKETCH5_R)
        with Locations(Location((24, 24, 0), (0, 0, 270))):
            Circle(SKETCH5_R_2, mode=Mode.SUBTRACT)
    # profile 3 of 4: a face of its own
    with BuildSketch(Plane(origin=(0, 0, 0), x_dir=(1, 0, 0), z_dir=(0, 1, 0)).offset(BOSS_EXTRUDE15_START)):
        with Locations(Location((-24, -24, 0), (0, 0, 270))):
            Circle(SKETCH5_R)
        with Locations(Location((-24, -24, 0), (0, 0, 270))):
            Circle(SKETCH5_R_2, mode=Mode.SUBTRACT)
    # profile 4 of 4: a face of its own
    with BuildSketch(Plane(origin=(0, 0, 0), x_dir=(1, 0, 0), z_dir=(0, 1, 0)).offset(BOSS_EXTRUDE15_START)):
        with Locations(Location((24, -24, 0), (0, 0, 270))):
            Circle(SKETCH5_R)
        with Locations(Location((24, -24, 0), (0, 0, 270))):
            Circle(SKETCH5_R_2, mode=Mode.SUBTRACT)
    extrude(amount=BOSS_EXTRUDE15_DEPTH)

    # Sketch5<2> → Cut-Extrude6 (cut)
    with BuildSketch(Plane(origin=(0, 0, 0), x_dir=(1, 0, 0), z_dir=(0, 1, 0))):
        with Locations(Location((-24, -24, 0), (0, 0, 270))):
            Circle(SKETCH5_2_R)
        with Locations(Location((24, -24, 0), (0, 0, 270))):
            Circle(SKETCH5_2_R)
        with Locations(Location((-24, 24, 0), (0, 0, 270))):
            Circle(SKETCH5_2_R)
        with Locations(Location((24, 24, 0), (0, 0, 270))):
            Circle(SKETCH5_2_R)
    extrude(amount=CUT_EXTRUDE6_DEPTH, mode=Mode.SUBTRACT)


solid = part.part
